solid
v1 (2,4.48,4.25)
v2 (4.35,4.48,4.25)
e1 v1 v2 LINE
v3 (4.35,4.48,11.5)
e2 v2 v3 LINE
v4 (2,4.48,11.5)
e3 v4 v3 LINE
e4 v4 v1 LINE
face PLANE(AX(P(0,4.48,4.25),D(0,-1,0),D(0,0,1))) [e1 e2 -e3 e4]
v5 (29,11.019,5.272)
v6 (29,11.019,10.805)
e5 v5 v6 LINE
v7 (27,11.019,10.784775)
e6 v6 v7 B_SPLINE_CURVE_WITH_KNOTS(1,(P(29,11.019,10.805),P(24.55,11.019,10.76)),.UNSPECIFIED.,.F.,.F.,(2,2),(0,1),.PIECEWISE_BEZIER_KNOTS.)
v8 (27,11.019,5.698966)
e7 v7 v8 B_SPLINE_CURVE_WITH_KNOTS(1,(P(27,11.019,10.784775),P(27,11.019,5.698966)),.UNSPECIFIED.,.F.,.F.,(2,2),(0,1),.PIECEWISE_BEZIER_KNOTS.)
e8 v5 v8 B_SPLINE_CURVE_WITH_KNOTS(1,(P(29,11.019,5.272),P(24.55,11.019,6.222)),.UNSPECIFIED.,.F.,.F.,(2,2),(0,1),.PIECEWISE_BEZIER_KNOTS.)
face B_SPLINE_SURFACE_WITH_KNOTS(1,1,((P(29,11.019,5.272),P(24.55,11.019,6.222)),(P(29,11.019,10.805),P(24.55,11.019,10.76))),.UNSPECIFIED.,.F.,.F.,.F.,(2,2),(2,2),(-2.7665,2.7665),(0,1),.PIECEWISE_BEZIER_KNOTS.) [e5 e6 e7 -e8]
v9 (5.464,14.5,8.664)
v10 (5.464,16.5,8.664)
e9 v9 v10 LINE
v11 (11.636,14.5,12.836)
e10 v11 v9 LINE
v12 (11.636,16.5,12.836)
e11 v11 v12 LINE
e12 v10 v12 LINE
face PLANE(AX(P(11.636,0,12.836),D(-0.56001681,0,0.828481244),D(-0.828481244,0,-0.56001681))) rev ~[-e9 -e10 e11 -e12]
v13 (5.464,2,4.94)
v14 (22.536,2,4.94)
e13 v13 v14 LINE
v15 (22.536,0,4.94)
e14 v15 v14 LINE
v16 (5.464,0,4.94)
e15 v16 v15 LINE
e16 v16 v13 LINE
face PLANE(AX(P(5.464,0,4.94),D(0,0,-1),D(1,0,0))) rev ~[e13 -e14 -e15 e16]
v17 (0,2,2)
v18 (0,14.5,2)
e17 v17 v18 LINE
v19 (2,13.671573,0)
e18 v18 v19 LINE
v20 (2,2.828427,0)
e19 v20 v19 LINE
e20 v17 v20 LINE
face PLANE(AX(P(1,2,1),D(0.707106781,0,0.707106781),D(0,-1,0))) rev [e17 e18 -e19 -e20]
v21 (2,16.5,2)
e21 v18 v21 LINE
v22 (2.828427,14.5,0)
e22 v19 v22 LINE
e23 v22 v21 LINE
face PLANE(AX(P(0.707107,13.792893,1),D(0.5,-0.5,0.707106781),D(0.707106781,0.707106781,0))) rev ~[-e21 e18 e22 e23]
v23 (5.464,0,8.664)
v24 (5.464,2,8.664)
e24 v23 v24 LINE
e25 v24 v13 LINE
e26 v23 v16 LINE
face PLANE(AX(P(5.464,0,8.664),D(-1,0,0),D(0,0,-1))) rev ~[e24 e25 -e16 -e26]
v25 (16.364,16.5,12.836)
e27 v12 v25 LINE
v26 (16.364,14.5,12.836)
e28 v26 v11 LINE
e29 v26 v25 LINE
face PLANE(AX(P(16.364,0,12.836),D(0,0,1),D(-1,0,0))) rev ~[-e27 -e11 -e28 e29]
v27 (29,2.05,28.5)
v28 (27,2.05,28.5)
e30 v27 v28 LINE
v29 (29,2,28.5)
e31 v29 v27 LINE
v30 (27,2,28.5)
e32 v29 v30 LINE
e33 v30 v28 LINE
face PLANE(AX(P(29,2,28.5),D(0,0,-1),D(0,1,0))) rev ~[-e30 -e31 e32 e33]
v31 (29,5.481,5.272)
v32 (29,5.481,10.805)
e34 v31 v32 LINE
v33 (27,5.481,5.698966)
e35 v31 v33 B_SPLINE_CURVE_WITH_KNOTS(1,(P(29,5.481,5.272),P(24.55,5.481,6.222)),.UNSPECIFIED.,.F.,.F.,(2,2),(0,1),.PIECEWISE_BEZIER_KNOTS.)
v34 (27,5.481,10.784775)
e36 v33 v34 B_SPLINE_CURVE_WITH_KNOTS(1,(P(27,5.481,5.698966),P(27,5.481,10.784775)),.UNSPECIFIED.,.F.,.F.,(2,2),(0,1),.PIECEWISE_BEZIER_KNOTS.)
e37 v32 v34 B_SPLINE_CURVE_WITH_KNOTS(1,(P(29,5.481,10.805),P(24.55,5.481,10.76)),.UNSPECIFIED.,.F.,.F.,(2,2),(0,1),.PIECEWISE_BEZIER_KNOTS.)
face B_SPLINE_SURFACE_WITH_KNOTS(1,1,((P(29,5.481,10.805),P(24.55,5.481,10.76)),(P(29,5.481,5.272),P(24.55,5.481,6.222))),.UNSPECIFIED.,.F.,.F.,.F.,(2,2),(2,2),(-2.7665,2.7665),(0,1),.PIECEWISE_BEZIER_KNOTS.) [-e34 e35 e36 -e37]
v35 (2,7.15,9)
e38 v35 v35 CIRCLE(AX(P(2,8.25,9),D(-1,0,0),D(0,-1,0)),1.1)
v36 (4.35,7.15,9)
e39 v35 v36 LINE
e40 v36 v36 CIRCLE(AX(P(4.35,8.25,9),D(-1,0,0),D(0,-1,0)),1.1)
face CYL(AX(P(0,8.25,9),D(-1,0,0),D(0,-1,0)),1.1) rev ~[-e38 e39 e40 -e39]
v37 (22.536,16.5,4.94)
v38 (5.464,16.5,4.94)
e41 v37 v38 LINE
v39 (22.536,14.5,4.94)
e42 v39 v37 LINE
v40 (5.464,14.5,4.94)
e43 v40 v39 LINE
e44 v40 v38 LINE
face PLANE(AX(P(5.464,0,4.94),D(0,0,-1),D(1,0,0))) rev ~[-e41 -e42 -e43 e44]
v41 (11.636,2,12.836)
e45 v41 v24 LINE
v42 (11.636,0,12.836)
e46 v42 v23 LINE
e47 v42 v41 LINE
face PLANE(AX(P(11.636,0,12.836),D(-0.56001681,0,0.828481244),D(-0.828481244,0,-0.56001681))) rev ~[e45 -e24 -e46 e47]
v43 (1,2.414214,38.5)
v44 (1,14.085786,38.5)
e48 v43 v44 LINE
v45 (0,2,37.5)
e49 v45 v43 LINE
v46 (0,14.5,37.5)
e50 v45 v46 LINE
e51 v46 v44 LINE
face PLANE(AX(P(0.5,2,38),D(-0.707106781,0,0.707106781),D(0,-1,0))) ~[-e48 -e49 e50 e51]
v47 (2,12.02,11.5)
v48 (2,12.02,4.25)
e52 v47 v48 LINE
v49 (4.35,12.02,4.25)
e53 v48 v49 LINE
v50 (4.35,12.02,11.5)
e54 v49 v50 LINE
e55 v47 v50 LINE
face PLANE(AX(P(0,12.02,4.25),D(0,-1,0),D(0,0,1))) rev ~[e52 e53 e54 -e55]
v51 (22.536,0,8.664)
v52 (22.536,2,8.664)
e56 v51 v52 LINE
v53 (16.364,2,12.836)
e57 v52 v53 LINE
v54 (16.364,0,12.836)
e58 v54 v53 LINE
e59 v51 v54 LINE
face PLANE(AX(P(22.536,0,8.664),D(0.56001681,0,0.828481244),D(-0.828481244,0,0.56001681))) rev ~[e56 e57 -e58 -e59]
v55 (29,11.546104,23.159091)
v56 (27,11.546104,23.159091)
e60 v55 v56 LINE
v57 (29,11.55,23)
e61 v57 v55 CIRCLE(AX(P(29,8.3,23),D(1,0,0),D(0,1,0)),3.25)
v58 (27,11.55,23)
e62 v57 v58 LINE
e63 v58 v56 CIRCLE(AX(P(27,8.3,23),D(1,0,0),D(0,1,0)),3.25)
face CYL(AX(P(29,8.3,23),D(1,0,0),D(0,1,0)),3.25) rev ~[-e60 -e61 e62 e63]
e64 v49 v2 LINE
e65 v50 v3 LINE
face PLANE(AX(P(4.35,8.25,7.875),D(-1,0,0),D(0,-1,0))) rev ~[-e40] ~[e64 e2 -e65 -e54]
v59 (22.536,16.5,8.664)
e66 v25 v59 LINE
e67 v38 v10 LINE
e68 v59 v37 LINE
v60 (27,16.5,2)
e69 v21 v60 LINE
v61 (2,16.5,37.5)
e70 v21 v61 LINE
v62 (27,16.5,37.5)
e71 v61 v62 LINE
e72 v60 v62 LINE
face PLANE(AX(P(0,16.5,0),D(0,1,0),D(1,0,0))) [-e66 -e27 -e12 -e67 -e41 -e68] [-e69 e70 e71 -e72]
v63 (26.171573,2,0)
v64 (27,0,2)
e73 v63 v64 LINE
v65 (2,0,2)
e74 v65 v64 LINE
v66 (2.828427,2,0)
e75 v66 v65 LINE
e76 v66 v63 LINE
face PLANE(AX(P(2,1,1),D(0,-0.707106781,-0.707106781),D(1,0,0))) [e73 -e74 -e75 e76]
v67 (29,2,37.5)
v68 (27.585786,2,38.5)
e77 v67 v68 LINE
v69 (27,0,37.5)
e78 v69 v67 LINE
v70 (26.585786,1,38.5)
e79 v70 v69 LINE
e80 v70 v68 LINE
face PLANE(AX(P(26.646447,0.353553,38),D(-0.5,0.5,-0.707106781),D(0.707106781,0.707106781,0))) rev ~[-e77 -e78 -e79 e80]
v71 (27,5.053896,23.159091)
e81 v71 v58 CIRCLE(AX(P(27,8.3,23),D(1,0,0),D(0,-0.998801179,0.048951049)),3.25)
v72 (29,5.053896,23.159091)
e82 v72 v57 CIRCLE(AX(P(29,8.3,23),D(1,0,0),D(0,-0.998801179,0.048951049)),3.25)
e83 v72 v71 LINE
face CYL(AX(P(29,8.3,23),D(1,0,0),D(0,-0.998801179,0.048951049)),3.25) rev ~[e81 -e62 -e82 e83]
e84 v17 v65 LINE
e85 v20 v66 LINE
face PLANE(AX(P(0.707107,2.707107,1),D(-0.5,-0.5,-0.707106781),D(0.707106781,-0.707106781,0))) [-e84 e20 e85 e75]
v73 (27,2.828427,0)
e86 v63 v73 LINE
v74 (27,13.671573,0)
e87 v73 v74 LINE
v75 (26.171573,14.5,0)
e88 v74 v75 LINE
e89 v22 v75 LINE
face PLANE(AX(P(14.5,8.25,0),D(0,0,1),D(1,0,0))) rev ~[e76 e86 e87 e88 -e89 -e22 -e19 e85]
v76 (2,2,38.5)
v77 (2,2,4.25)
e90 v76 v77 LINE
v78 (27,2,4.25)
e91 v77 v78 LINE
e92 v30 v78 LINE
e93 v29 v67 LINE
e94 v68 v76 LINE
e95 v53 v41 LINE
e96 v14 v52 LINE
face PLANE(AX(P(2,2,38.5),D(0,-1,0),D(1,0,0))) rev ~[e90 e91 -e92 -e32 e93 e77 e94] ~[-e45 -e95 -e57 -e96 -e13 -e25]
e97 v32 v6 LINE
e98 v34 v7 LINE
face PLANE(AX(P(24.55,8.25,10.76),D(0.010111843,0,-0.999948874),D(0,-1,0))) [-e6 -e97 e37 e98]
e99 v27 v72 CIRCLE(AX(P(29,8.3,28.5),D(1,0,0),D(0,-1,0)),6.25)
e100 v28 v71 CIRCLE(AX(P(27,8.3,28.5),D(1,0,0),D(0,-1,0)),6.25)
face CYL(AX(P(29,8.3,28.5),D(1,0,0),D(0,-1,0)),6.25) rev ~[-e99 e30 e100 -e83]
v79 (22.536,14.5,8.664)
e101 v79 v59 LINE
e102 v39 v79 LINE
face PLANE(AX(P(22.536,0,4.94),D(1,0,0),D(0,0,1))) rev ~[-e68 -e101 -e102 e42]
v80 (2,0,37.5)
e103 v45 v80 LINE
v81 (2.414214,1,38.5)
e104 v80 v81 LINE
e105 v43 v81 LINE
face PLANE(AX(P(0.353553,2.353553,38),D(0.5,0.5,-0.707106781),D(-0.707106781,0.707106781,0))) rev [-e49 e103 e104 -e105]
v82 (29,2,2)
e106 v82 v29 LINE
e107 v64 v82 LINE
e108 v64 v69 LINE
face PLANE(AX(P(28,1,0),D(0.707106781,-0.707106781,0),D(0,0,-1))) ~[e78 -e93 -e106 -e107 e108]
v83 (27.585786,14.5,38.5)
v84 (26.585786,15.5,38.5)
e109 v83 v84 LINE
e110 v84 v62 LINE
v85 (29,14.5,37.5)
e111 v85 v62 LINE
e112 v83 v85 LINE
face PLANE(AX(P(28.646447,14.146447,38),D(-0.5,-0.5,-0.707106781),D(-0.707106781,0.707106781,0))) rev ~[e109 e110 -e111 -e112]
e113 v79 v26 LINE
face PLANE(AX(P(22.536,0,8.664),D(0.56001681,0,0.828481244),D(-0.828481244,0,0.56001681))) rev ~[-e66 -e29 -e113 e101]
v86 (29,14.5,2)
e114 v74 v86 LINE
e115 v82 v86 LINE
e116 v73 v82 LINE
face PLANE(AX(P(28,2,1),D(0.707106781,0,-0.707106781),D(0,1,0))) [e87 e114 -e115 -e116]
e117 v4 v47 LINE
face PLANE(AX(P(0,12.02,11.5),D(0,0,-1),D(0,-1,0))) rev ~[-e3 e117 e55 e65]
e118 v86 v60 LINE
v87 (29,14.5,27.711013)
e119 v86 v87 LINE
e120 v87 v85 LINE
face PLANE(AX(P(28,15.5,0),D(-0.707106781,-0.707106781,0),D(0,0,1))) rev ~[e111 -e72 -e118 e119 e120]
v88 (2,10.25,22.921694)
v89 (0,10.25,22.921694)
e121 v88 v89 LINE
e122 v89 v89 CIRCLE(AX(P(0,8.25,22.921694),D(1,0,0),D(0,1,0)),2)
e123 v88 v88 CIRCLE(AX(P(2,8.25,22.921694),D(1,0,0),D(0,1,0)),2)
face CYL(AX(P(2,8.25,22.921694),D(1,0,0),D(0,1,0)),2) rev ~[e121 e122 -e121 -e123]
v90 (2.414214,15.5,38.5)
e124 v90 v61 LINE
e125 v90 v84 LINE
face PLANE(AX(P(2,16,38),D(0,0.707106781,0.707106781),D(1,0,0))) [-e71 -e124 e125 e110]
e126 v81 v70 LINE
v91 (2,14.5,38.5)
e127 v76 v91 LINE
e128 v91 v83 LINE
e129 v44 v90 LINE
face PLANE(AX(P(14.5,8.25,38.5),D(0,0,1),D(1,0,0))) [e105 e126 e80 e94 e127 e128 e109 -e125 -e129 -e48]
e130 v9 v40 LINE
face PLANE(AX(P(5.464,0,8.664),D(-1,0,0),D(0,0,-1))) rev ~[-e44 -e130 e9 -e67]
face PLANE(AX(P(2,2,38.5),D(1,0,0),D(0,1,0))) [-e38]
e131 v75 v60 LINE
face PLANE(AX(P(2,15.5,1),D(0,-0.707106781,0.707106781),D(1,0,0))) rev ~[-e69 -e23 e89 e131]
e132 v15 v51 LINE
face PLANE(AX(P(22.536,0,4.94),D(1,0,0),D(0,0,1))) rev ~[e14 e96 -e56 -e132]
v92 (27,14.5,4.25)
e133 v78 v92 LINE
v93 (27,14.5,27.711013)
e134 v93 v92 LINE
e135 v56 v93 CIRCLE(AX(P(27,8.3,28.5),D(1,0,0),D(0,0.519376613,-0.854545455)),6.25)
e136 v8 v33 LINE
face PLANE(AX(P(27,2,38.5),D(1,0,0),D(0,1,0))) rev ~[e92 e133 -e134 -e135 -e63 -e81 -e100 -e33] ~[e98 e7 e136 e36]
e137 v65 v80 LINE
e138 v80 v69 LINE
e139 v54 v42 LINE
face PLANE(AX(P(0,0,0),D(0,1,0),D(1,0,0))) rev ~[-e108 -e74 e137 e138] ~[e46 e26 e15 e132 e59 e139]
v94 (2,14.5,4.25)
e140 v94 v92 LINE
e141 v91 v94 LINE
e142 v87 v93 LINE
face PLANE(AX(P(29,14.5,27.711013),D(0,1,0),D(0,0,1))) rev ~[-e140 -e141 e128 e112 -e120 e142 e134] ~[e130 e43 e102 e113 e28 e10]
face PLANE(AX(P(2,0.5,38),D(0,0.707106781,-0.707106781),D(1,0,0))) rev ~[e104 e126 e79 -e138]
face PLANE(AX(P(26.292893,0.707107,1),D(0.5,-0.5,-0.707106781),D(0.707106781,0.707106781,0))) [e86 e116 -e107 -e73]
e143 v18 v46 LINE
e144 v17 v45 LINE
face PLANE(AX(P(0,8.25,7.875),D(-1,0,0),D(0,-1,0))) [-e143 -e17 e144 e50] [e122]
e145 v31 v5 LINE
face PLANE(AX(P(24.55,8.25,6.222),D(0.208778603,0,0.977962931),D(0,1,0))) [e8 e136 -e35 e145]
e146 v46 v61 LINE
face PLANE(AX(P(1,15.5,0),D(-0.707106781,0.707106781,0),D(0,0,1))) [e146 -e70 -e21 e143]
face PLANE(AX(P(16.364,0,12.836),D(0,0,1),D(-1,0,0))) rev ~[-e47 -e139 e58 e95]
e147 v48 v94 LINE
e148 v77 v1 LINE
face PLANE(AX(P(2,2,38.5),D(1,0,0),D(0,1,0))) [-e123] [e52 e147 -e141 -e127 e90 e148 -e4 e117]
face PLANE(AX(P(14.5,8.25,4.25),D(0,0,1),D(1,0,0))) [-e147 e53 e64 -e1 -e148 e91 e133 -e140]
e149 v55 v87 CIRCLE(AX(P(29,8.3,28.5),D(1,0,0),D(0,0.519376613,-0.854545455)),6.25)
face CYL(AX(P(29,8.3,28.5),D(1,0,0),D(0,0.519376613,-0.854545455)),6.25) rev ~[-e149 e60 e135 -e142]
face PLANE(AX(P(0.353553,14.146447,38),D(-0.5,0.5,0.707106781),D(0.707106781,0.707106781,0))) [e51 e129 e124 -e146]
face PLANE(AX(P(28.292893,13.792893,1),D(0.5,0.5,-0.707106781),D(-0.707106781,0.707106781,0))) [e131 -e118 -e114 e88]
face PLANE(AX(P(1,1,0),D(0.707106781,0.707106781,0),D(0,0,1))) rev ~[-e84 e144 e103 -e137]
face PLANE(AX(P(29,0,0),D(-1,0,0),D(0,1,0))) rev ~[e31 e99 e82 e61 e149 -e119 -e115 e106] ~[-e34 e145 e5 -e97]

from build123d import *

# Parameters (mm, degrees)
F0_W      = 29
F0_H      = 16.5
F1_DEPTH  = 38.5
F2_SIZE   = 2
F3_SIZE   = 2
F4_SIZE   = 1
F5_W      = 25
F5_H      = 12.5
F6_DEPTH  = 34.25
F8_DEPTH  = 16.501
F9_W      = 12.5
F9_H      = 1
F10_DEPTH = 25
F11_W     = 7.54
F11_H     = 7.25
F11_R     = 1.1
F12_DEPTH = 4.35
F13_R     = 2
F14_DEPTH = 25
F15_W     = 5.538
F15_H     = 5.533
F17_W     = 5.538
F17_H     = 4.538


with BuildPart() as f1:
    # F0 (on Top) → F1 (new body)
    with BuildSketch(Plane.XY):
        with Locations((14.5, 8.25)):
            Rectangle(F0_W, F0_H)
    extrude(amount=F1_DEPTH)

    # F2
    f2_edges = [f1.edges().sort_by_distance(p)[0] for p in [
        (0, 0, 19.25),
        (0, 16.5, 19.25),
        (29, 0, 19.25),
        (29, 16.5, 19.25),
    ]]
    chamfer(f2_edges, length=F2_SIZE)

    # F3
    f3_edges = [f1.edges().sort_by_distance(p)[0] for p in [
        (0, 8.25, 0),
        (1, 15.5, 0),
        (1, 1, 0),
        (14.5, 16.5, 0),
        (14.5, 0, 0),
        (28, 15.5, 0),
        (28, 1, 0),
        (29, 8.25, 0),
    ]]
    chamfer(f3_edges, length=F3_SIZE)

    # F4
    f4_edges = [f1.edges().sort_by_distance(p)[0] for p in [
        (0, 8.25, 38.5),
        (1, 15.5, 38.5),
        (1, 1, 38.5),
        (14.5, 16.5, 38.5),
        (14.5, 0, 38.5),
        (28, 15.5, 38.5),
        (28, 1, 38.5),
        (29, 8.25, 38.5),
    ]]
    chamfer(f4_edges, length=F4_SIZE)

    # F5 (on face) → F6 (cut)
    with BuildSketch(Plane.XY.offset(38.5)):
        with Locations((14.5, 8.25)):
            Rectangle(F5_W, F5_H)
    extrude(amount=-F6_DEPTH, mode=Mode.SUBTRACT)

    # F7 (on face) → F8 (cut, through all)
    with BuildSketch(Plane.XZ):
        Polygon((5.464, 8.664), (5.464, 4.94), (22.536, 4.94), (22.536, 8.664), (16.364, 12.836), (11.636, 12.836), align=None)
    extrude(amount=-F8_DEPTH, mode=Mode.SUBTRACT)

    # F9 (on face) → F10 (cut)
    with BuildSketch(Plane.YZ.offset(29)):
        with BuildLine():
            ThreePointArc((5.0538961688, 23.1590909091), (8.2204306945, 19.7509741882), (11.55, 23))
            ThreePointArc((11.55, 23), (11.5490258118, 23.0795693055), (11.5461038312, 23.1590909091))
            ThreePointArc((11.5461038312, 23.1590909091), (8.3, 22.25), (5.0538961688, 23.1590909091))
        make_face()
        with BuildLine():
            ThreePointArc((5.0538961688, 23.1590909091), (8.3, 22.25), (11.5461038312, 23.1590909091))
            ThreePointArc((11.5461038312, 23.1590909091), (8.3, 26.25), (5.0538961688, 23.1590909091))
        make_face()
        with BuildLine():
            ThreePointArc((5.0538961688, 23.1590909091), (8.3, 26.25), (11.5461038312, 23.1590909091))
            ThreePointArc((11.5461038312, 23.1590909091), (13.5428254576, 25.0977535038), (14.5, 27.7110133081))
            Line((14.5, 27.7110133081), (14.5, 28.5))
            Line((14.5, 28.5), (2.05, 28.5))
            ThreePointArc((2.05, 28.5), (2.8524937382, 25.4361502113), (5.0538961688, 23.1590909091))
        make_face()
        with BuildLine():
            Line((2, 28.5), (2.05, 28.5))
            ThreePointArc((2.05, 28.5), (7.9047152925, 34.7374874749), (14.5, 29.2889866919))
            Line((14.5, 29.2889866919), (14.5, 37.5))
            Line((14.5, 37.5), (2, 37.5))
            Line((2, 37.5), (2, 28.5))
        make_face()
        with BuildLine():
            ThreePointArc((14.5, 29.2889866919), (7.9047152925, 34.7374874749), (2.05, 28.5))
            Line((2.05, 28.5), (14.5, 28.5))
            Line((14.5, 28.5), (14.5, 29.2889866919))
        make_face()
        with Locations((8.25, 38)):
            Rectangle(F9_W, F9_H)
    extrude(amount=-F10_DEPTH, mode=Mode.SUBTRACT)

    # F11 (on face) → F12 (join)
    with BuildSketch(Plane(origin=(0, 0, 0), x_dir=(0, -1, 0), z_dir=(-1, 0, 0))):
        with Locations((-8.25, 7.875)):
            Rectangle(F11_W, F11_H)
        with Locations((-8.25, 9)):
            Circle(F11_R, mode=Mode.SUBTRACT)
    extrude(amount=-F12_DEPTH)

    # F13 (on face) → F14 (cut)
    with BuildSketch(Plane.YZ.offset(2)):
        with Locations((8.25, 22.9216944426)):
            Circle(F13_R)
    extrude(amount=-F14_DEPTH, mode=Mode.SUBTRACT)

    # F15 (on face) → F18 section 0
    with BuildSketch(Plane.YZ.offset(29)):
        with Locations((8.25, 8.0385)):
            Rectangle(F15_W, F15_H)
    # F17 (on offset) → F18 section 1
    with BuildSketch(Plane.YZ.offset(24.55)):
        with Locations((8.25, 8.491)):
            Rectangle(F17_W, F17_H)
    loft(mode=Mode.SUBTRACT)


solid = f1.part
